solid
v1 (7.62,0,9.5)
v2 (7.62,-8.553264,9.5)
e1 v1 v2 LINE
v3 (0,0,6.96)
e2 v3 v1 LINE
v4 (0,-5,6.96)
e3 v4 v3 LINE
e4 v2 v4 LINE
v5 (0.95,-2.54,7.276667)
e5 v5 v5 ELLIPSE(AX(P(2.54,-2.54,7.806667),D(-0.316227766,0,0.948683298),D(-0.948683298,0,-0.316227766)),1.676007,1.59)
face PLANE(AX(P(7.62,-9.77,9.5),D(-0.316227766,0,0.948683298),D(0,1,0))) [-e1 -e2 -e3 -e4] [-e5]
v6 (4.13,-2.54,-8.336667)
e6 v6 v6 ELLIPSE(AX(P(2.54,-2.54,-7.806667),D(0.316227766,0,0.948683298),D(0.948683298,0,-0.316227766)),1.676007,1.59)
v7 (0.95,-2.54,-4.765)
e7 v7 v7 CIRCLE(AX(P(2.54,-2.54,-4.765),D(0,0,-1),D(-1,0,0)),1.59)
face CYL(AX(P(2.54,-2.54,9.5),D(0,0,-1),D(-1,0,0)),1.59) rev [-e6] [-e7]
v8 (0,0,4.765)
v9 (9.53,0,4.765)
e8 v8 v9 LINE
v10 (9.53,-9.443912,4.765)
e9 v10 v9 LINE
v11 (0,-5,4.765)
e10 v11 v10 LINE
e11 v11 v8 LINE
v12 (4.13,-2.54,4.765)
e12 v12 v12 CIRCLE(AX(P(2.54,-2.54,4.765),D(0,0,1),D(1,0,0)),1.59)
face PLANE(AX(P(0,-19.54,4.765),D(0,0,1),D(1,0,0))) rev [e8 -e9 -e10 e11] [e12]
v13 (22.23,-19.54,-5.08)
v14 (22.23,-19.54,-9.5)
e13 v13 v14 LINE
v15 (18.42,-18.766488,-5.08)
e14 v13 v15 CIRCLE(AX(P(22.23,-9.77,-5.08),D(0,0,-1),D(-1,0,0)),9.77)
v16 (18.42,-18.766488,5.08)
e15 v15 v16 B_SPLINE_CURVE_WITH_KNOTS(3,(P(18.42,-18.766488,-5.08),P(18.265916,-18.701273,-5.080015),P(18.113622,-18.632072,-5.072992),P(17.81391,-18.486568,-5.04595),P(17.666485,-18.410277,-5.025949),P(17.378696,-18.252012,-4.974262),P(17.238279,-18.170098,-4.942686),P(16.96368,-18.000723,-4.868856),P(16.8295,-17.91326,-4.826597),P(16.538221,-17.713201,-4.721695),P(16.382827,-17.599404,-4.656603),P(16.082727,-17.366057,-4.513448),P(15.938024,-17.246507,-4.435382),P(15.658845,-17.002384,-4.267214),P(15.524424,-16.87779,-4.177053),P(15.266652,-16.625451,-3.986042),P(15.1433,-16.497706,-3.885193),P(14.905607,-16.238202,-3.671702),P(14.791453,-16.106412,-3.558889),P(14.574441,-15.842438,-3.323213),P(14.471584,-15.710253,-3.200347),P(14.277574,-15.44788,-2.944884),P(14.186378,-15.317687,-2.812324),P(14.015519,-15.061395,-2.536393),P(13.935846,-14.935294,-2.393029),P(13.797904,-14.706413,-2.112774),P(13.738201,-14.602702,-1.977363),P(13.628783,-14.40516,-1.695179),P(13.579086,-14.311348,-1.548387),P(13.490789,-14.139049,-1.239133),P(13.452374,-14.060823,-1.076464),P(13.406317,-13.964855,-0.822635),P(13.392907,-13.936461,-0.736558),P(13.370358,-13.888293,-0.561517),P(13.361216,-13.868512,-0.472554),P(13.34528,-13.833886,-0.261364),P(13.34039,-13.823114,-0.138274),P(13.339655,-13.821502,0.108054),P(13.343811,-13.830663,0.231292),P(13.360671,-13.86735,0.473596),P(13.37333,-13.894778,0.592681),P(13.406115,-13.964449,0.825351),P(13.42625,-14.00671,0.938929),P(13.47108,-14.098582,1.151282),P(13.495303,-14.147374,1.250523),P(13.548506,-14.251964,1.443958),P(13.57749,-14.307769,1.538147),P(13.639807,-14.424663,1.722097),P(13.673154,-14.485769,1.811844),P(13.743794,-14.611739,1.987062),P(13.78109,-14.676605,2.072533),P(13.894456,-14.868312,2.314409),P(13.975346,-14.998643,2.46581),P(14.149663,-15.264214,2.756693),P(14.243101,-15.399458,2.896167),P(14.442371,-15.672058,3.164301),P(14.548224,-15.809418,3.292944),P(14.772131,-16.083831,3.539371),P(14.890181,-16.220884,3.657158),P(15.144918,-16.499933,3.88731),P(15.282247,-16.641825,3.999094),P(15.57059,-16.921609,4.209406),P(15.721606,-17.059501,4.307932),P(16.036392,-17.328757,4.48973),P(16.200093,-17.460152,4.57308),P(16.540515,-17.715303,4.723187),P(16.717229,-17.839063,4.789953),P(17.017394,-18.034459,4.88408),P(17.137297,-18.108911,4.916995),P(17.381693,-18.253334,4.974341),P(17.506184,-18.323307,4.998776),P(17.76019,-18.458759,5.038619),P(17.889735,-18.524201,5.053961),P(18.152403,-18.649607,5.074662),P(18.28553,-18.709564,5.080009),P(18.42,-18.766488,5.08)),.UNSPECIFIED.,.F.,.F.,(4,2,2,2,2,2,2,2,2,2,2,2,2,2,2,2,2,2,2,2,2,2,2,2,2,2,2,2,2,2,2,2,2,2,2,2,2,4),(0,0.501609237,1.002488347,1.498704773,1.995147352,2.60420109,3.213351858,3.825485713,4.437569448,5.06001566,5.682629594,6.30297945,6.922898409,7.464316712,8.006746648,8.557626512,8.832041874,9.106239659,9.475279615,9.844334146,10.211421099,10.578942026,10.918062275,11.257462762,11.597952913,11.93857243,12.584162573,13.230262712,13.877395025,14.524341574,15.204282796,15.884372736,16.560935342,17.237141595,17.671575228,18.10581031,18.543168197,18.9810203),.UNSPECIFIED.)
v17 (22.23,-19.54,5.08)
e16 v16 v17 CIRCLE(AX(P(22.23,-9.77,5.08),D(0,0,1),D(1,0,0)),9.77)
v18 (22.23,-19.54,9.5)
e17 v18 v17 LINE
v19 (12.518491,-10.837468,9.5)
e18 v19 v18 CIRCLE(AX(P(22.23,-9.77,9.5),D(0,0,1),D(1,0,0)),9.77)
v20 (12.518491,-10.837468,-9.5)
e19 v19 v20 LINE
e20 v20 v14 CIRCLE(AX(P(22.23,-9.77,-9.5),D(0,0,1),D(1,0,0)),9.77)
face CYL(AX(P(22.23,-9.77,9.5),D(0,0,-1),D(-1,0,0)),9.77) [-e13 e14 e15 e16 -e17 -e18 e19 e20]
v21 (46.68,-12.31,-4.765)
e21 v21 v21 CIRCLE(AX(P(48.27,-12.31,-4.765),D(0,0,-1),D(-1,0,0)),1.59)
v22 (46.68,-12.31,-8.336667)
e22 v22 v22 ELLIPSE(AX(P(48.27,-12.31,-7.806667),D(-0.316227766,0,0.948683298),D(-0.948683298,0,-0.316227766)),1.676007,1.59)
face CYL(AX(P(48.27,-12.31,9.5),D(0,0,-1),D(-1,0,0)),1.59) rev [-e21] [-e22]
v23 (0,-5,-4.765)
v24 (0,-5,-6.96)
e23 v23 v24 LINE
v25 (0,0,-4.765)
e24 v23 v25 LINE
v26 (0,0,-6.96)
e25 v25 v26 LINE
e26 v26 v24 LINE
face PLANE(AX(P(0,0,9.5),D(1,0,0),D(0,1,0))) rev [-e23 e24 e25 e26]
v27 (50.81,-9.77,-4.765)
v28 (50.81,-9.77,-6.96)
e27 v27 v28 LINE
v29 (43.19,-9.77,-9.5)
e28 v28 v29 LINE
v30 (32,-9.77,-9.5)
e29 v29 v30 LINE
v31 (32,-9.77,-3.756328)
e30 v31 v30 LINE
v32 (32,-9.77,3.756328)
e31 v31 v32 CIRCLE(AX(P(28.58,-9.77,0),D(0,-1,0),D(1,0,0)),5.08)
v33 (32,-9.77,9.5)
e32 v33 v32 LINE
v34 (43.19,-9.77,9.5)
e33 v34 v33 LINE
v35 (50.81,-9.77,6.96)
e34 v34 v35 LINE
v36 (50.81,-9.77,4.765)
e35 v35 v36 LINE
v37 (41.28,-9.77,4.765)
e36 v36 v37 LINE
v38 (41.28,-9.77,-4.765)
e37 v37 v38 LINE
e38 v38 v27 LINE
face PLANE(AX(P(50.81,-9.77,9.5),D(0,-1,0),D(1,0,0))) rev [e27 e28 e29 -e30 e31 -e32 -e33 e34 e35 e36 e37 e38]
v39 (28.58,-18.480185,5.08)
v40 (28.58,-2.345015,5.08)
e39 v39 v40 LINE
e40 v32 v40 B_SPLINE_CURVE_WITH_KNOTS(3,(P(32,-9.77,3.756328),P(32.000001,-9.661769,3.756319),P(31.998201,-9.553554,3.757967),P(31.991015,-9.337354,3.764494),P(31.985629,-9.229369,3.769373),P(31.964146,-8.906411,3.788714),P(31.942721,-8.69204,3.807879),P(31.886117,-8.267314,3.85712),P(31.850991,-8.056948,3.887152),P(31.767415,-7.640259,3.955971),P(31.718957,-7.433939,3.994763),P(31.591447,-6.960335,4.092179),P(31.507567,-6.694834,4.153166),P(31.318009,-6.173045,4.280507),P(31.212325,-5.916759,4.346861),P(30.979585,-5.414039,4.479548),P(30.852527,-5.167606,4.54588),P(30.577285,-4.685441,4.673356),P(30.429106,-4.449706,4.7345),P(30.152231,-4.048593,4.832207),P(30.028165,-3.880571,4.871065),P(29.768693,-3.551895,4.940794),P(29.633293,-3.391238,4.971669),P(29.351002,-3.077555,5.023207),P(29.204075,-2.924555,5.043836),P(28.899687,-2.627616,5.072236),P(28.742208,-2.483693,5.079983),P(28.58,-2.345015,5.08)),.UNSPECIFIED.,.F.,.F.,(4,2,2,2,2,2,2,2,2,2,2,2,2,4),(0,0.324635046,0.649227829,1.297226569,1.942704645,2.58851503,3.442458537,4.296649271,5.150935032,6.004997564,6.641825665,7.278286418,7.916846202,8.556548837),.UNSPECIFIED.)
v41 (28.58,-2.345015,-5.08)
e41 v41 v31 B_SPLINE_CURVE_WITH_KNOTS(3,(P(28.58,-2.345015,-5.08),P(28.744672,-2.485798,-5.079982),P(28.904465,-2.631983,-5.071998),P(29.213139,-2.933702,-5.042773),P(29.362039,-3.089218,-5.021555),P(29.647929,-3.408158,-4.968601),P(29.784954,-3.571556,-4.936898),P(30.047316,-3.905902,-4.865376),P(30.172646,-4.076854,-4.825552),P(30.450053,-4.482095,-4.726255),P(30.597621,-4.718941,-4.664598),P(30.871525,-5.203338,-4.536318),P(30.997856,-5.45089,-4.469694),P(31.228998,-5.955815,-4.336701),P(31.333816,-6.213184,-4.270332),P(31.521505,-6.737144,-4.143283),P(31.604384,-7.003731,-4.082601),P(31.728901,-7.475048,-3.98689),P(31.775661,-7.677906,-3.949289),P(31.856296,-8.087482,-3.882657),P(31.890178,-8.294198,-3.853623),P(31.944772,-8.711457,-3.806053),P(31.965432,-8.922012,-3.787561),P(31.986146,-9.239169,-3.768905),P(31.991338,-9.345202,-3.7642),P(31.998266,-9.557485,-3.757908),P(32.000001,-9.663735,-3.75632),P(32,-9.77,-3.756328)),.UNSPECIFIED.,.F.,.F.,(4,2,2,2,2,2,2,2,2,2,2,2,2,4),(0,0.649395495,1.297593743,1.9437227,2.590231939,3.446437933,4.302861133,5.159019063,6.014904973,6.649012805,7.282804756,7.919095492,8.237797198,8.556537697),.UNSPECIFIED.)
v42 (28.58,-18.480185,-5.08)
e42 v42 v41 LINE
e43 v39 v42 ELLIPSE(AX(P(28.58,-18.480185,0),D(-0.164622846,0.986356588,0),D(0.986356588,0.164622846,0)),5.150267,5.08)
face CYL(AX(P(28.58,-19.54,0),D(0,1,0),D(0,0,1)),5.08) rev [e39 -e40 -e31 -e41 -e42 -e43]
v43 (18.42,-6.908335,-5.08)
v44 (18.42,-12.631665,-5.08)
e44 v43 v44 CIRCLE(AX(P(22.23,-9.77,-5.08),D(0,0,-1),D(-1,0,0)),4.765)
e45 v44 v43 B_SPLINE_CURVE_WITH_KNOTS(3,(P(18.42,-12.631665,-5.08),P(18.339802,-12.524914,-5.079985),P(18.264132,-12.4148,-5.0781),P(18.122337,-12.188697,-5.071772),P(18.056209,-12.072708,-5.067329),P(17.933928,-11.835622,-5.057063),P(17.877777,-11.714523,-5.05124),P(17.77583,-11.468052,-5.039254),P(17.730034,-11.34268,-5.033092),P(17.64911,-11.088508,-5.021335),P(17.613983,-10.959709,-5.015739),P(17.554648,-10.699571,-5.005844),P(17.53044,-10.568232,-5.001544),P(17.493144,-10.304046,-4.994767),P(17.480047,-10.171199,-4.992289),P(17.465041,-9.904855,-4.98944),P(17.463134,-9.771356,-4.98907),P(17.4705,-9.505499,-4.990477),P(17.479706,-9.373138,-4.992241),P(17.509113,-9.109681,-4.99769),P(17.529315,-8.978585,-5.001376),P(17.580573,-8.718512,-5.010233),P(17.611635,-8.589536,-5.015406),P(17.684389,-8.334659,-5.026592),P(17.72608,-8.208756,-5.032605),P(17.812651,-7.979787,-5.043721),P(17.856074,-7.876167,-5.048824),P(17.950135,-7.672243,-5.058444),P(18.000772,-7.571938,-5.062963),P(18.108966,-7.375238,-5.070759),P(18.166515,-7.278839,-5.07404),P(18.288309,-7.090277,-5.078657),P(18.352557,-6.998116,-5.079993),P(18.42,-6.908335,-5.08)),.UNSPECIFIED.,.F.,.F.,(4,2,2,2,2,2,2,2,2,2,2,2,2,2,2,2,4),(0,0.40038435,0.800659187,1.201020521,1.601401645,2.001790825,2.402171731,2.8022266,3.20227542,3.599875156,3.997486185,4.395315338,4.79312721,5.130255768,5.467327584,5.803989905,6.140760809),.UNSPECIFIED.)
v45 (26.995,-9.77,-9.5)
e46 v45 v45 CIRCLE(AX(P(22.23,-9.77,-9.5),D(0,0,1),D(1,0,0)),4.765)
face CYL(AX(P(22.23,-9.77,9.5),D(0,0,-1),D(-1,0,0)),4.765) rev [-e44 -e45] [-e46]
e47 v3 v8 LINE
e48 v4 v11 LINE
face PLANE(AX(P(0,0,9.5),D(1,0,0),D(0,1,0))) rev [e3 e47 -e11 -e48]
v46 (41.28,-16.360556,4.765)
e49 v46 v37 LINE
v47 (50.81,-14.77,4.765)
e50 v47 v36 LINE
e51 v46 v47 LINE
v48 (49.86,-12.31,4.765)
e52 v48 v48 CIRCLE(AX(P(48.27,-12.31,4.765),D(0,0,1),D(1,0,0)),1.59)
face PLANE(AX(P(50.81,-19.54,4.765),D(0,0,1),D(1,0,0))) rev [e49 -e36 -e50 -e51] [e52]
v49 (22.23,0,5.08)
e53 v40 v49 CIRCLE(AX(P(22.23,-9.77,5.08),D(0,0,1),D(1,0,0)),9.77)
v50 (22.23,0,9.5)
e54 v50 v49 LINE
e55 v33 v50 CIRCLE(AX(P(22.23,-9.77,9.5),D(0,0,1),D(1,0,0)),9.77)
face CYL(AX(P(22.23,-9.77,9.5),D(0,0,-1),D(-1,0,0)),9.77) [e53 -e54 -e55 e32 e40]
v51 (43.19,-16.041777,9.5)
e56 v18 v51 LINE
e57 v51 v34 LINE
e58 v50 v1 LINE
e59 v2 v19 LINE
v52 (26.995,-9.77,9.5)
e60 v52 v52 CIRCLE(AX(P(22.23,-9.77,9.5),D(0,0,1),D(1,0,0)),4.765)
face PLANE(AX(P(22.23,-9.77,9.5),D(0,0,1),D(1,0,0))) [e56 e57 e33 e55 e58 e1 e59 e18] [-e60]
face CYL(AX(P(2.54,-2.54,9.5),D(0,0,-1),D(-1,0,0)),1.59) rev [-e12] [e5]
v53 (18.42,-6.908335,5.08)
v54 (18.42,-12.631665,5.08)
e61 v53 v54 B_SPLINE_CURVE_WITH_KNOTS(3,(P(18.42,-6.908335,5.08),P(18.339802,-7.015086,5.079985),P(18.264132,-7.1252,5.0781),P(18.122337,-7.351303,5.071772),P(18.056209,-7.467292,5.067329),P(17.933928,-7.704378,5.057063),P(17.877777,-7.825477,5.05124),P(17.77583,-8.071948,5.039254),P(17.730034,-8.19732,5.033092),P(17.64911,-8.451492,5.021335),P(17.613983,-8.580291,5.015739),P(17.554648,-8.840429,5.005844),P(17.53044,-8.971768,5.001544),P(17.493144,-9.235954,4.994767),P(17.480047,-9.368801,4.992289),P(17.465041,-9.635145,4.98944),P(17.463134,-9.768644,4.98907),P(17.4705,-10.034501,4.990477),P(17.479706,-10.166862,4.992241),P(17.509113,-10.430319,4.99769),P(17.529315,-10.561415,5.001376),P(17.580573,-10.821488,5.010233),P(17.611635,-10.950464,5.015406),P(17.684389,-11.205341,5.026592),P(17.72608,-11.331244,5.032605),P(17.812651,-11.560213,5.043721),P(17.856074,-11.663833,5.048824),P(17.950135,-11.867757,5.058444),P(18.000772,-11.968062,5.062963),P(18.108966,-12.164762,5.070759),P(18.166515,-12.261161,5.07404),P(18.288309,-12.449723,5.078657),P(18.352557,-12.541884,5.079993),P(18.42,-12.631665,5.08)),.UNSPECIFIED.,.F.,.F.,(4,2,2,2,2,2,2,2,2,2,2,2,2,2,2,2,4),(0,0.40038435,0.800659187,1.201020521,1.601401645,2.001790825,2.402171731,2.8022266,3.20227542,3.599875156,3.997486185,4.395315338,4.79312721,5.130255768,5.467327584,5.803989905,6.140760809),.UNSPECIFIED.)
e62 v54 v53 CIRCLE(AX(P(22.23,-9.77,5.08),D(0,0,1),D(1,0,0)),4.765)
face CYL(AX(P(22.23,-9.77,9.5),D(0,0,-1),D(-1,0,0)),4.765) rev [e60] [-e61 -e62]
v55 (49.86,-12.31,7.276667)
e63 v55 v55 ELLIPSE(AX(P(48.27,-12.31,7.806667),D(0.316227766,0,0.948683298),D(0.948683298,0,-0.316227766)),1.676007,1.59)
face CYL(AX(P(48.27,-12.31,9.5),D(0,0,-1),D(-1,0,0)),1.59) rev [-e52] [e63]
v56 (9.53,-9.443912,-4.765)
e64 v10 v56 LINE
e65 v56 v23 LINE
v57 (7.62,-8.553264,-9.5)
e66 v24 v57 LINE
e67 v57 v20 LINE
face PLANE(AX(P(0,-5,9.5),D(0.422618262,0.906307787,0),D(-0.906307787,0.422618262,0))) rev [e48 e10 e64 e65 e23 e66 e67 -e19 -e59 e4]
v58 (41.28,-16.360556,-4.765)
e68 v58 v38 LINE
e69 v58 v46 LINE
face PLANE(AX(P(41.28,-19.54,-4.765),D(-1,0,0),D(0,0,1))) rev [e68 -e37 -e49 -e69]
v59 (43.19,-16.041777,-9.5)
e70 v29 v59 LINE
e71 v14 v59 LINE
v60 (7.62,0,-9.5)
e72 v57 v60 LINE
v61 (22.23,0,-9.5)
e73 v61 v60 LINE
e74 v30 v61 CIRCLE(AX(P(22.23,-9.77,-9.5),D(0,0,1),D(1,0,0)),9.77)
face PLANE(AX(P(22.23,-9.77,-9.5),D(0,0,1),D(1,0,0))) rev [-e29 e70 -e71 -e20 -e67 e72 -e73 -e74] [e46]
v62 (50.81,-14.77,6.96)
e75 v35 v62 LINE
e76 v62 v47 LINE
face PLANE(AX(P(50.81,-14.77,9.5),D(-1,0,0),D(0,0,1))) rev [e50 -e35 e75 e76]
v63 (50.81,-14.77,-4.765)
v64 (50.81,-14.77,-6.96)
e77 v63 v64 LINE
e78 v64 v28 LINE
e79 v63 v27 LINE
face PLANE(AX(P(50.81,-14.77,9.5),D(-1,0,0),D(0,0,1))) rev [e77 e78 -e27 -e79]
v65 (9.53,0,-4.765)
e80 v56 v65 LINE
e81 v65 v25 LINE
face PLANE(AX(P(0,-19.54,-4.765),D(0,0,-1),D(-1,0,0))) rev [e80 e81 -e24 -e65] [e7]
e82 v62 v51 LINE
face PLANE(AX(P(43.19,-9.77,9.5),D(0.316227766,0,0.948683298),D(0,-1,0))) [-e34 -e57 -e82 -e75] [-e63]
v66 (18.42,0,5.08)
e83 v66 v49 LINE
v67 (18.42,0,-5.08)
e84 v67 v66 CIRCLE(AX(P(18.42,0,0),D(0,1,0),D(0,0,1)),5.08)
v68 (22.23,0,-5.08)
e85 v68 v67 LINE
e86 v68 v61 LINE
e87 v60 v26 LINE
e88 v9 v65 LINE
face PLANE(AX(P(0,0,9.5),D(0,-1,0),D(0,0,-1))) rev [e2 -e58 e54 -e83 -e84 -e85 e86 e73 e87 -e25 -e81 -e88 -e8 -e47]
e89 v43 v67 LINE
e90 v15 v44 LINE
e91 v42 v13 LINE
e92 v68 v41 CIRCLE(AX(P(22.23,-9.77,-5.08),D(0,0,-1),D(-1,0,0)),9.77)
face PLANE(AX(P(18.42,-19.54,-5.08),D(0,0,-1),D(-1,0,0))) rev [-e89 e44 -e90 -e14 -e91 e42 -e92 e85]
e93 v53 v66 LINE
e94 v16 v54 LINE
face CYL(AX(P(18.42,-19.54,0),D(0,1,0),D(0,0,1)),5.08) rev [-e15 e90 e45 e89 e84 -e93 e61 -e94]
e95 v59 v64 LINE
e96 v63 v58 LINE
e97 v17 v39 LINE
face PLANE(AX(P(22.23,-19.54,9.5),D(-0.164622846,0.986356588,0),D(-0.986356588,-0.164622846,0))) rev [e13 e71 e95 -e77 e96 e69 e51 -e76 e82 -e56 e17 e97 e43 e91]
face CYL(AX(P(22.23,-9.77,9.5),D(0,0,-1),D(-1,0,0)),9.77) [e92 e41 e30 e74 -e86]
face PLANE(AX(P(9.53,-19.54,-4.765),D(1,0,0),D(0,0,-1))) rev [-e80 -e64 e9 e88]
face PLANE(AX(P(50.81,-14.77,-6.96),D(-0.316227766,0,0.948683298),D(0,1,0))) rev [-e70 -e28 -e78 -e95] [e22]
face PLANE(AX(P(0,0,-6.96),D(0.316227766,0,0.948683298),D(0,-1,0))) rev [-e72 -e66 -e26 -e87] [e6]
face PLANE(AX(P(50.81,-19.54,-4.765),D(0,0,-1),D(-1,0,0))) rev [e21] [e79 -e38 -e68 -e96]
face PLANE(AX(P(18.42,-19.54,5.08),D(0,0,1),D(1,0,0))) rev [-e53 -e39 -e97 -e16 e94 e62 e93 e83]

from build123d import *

# Parameters (mm, degrees)
SKETCH1_R           = 4.765
SKETCH1_R_2         = 1.59
BOSS_EXTRUDE1_DEPTH = 9.5
CHAMFER1_SIZE       = 2.54
CHAMFER1_SIZE_2     = 7.62
CHAMFER2_SIZE       = 7.62
CHAMFER2_SIZE_2     = 2.54
SKETCH2_W           = 9.53
SKETCH2_H           = 9.53
CUT_EXTRUDE1_DEPTH  = 56.26045331
CUT_EXTRUDE2_DEPTH  = 56.26045331


with BuildPart() as part:
    # Sketch1 → Boss-Extrude1 (new, symmetric)
    with BuildSketch(Plane.XY):
        with BuildLine():
            Line((0, 0), (0, -5))
            Line((0, -5), (12.518490754, -10.837468107))
            ThreePointArc((12.518490754, -10.837468107), (15.709887401, -17.046058803), (22.23, -19.54))
            Line((22.23, -19.54), (50.81, -14.77))
            Line((50.81, -14.77), (50.81, -9.77))
            Line((50.81, -9.77), (32, -9.77))
            ThreePointArc((32, -9.77), (29.138433252, -2.861566748), (22.23, 0))
            Line((22.23, 0), (0, 0))
        make_face()
        with Locations((22.23, -9.77)):
            Circle(SKETCH1_R, mode=Mode.SUBTRACT)
        with Locations((2.54, -2.54)):
            Circle(SKETCH1_R_2, mode=Mode.SUBTRACT)
        with Locations((48.27, -12.31)):
            Circle(SKETCH1_R_2, mode=Mode.SUBTRACT)
    extrude(amount=BOSS_EXTRUDE1_DEPTH, both=True)

    # Chamfer1
    # the kernel refuses this chamfer: 7.62, 2.54 mm, written as the material it takes off along each edge
    with BuildSketch(Plane(origin=(0, 19.774364901, -9.5), x_dir=(-0.10902612017980703, 0, 0.9940388851139267), z_dir=(0, -1, 0))) as chamfer1_piece_1:
        Polygon((CHAMFER1_SIZE * 0.994038885114, -CHAMFER1_SIZE * 0.10902612018), (-CHAMFER1_SIZE_2 * 0.10902612018, -CHAMFER1_SIZE_2 * 0.994038885114), (0, 0), align=None)
    extrude(amount=44.548729802, mode=Mode.SUBTRACT)
    with BuildSketch(Plane(origin=(0, 19.774364901, 9.5), x_dir=(-0.10902612017980703, 0, -0.9940388851139267), z_dir=(0, -1, 0)), Plane(origin=(50.81, -34.544364901, 9.5), x_dir=(0.10902612017980588, 0, -0.9940388851139268), z_dir=(0, 1, 0))) as chamfer1_piece_2:
        Polygon((CHAMFER1_SIZE * 0.994038885114, CHAMFER1_SIZE * 0.10902612018), (-CHAMFER1_SIZE_2 * 0.10902612018, CHAMFER1_SIZE_2 * 0.994038885114), (0, 0), align=None)
    extrude(amount=44.548729802, mode=Mode.SUBTRACT)

    # Chamfer2
    # the kernel refuses this chamfer: 7.62, 2.54 mm, written as the material it takes off along each edge
    with BuildSketch(Plane(origin=(50.81, -34.544364901, -9.5), x_dir=(-0.9999257509361694, 0, -0.01218575458219919), z_dir=(0, 1, 0))) as chamfer2_piece_1:
        Polygon((CHAMFER2_SIZE * 0.999925750936, CHAMFER2_SIZE * 0.0121857545822), (-CHAMFER2_SIZE_2 * 0.0121857545822, CHAMFER2_SIZE_2 * 0.999925750936), (0, 0), align=None)
    extrude(amount=44.548729802, mode=Mode.SUBTRACT)

    # Sketch2 → Cut-Extrude1 (cut, through all)
    with BuildSketch(Plane(origin=(0, 0, 0), x_dir=(1, 0, 0), z_dir=(0, 1, 0))):
        with Locations((4.765, 0)):
            Rectangle(SKETCH2_W, SKETCH2_H)
        with Locations((46.045, 0)):
            Rectangle(SKETCH2_W, SKETCH2_H)
    extrude(amount=-CUT_EXTRUDE1_DEPTH, mode=Mode.SUBTRACT)

    # Sketch3 → Cut-Extrude2 (cut, through all)
    with BuildSketch(Plane(origin=(0, 0, 0), x_dir=(1, 0, 0), z_dir=(0, 1, 0))):
        with BuildLine():
            Line((18.42, 5.08), (28.58, 5.08))
            ThreePointArc((28.58, 5.08), (33.66, 0), (28.58, -5.08))
            Line((28.58, -5.08), (18.42, -5.08))
            ThreePointArc((18.42, -5.08), (13.34, 0), (18.42, 5.08))
        make_face()
    extrude(amount=-CUT_EXTRUDE2_DEPTH, mode=Mode.SUBTRACT)


solid = part.part
